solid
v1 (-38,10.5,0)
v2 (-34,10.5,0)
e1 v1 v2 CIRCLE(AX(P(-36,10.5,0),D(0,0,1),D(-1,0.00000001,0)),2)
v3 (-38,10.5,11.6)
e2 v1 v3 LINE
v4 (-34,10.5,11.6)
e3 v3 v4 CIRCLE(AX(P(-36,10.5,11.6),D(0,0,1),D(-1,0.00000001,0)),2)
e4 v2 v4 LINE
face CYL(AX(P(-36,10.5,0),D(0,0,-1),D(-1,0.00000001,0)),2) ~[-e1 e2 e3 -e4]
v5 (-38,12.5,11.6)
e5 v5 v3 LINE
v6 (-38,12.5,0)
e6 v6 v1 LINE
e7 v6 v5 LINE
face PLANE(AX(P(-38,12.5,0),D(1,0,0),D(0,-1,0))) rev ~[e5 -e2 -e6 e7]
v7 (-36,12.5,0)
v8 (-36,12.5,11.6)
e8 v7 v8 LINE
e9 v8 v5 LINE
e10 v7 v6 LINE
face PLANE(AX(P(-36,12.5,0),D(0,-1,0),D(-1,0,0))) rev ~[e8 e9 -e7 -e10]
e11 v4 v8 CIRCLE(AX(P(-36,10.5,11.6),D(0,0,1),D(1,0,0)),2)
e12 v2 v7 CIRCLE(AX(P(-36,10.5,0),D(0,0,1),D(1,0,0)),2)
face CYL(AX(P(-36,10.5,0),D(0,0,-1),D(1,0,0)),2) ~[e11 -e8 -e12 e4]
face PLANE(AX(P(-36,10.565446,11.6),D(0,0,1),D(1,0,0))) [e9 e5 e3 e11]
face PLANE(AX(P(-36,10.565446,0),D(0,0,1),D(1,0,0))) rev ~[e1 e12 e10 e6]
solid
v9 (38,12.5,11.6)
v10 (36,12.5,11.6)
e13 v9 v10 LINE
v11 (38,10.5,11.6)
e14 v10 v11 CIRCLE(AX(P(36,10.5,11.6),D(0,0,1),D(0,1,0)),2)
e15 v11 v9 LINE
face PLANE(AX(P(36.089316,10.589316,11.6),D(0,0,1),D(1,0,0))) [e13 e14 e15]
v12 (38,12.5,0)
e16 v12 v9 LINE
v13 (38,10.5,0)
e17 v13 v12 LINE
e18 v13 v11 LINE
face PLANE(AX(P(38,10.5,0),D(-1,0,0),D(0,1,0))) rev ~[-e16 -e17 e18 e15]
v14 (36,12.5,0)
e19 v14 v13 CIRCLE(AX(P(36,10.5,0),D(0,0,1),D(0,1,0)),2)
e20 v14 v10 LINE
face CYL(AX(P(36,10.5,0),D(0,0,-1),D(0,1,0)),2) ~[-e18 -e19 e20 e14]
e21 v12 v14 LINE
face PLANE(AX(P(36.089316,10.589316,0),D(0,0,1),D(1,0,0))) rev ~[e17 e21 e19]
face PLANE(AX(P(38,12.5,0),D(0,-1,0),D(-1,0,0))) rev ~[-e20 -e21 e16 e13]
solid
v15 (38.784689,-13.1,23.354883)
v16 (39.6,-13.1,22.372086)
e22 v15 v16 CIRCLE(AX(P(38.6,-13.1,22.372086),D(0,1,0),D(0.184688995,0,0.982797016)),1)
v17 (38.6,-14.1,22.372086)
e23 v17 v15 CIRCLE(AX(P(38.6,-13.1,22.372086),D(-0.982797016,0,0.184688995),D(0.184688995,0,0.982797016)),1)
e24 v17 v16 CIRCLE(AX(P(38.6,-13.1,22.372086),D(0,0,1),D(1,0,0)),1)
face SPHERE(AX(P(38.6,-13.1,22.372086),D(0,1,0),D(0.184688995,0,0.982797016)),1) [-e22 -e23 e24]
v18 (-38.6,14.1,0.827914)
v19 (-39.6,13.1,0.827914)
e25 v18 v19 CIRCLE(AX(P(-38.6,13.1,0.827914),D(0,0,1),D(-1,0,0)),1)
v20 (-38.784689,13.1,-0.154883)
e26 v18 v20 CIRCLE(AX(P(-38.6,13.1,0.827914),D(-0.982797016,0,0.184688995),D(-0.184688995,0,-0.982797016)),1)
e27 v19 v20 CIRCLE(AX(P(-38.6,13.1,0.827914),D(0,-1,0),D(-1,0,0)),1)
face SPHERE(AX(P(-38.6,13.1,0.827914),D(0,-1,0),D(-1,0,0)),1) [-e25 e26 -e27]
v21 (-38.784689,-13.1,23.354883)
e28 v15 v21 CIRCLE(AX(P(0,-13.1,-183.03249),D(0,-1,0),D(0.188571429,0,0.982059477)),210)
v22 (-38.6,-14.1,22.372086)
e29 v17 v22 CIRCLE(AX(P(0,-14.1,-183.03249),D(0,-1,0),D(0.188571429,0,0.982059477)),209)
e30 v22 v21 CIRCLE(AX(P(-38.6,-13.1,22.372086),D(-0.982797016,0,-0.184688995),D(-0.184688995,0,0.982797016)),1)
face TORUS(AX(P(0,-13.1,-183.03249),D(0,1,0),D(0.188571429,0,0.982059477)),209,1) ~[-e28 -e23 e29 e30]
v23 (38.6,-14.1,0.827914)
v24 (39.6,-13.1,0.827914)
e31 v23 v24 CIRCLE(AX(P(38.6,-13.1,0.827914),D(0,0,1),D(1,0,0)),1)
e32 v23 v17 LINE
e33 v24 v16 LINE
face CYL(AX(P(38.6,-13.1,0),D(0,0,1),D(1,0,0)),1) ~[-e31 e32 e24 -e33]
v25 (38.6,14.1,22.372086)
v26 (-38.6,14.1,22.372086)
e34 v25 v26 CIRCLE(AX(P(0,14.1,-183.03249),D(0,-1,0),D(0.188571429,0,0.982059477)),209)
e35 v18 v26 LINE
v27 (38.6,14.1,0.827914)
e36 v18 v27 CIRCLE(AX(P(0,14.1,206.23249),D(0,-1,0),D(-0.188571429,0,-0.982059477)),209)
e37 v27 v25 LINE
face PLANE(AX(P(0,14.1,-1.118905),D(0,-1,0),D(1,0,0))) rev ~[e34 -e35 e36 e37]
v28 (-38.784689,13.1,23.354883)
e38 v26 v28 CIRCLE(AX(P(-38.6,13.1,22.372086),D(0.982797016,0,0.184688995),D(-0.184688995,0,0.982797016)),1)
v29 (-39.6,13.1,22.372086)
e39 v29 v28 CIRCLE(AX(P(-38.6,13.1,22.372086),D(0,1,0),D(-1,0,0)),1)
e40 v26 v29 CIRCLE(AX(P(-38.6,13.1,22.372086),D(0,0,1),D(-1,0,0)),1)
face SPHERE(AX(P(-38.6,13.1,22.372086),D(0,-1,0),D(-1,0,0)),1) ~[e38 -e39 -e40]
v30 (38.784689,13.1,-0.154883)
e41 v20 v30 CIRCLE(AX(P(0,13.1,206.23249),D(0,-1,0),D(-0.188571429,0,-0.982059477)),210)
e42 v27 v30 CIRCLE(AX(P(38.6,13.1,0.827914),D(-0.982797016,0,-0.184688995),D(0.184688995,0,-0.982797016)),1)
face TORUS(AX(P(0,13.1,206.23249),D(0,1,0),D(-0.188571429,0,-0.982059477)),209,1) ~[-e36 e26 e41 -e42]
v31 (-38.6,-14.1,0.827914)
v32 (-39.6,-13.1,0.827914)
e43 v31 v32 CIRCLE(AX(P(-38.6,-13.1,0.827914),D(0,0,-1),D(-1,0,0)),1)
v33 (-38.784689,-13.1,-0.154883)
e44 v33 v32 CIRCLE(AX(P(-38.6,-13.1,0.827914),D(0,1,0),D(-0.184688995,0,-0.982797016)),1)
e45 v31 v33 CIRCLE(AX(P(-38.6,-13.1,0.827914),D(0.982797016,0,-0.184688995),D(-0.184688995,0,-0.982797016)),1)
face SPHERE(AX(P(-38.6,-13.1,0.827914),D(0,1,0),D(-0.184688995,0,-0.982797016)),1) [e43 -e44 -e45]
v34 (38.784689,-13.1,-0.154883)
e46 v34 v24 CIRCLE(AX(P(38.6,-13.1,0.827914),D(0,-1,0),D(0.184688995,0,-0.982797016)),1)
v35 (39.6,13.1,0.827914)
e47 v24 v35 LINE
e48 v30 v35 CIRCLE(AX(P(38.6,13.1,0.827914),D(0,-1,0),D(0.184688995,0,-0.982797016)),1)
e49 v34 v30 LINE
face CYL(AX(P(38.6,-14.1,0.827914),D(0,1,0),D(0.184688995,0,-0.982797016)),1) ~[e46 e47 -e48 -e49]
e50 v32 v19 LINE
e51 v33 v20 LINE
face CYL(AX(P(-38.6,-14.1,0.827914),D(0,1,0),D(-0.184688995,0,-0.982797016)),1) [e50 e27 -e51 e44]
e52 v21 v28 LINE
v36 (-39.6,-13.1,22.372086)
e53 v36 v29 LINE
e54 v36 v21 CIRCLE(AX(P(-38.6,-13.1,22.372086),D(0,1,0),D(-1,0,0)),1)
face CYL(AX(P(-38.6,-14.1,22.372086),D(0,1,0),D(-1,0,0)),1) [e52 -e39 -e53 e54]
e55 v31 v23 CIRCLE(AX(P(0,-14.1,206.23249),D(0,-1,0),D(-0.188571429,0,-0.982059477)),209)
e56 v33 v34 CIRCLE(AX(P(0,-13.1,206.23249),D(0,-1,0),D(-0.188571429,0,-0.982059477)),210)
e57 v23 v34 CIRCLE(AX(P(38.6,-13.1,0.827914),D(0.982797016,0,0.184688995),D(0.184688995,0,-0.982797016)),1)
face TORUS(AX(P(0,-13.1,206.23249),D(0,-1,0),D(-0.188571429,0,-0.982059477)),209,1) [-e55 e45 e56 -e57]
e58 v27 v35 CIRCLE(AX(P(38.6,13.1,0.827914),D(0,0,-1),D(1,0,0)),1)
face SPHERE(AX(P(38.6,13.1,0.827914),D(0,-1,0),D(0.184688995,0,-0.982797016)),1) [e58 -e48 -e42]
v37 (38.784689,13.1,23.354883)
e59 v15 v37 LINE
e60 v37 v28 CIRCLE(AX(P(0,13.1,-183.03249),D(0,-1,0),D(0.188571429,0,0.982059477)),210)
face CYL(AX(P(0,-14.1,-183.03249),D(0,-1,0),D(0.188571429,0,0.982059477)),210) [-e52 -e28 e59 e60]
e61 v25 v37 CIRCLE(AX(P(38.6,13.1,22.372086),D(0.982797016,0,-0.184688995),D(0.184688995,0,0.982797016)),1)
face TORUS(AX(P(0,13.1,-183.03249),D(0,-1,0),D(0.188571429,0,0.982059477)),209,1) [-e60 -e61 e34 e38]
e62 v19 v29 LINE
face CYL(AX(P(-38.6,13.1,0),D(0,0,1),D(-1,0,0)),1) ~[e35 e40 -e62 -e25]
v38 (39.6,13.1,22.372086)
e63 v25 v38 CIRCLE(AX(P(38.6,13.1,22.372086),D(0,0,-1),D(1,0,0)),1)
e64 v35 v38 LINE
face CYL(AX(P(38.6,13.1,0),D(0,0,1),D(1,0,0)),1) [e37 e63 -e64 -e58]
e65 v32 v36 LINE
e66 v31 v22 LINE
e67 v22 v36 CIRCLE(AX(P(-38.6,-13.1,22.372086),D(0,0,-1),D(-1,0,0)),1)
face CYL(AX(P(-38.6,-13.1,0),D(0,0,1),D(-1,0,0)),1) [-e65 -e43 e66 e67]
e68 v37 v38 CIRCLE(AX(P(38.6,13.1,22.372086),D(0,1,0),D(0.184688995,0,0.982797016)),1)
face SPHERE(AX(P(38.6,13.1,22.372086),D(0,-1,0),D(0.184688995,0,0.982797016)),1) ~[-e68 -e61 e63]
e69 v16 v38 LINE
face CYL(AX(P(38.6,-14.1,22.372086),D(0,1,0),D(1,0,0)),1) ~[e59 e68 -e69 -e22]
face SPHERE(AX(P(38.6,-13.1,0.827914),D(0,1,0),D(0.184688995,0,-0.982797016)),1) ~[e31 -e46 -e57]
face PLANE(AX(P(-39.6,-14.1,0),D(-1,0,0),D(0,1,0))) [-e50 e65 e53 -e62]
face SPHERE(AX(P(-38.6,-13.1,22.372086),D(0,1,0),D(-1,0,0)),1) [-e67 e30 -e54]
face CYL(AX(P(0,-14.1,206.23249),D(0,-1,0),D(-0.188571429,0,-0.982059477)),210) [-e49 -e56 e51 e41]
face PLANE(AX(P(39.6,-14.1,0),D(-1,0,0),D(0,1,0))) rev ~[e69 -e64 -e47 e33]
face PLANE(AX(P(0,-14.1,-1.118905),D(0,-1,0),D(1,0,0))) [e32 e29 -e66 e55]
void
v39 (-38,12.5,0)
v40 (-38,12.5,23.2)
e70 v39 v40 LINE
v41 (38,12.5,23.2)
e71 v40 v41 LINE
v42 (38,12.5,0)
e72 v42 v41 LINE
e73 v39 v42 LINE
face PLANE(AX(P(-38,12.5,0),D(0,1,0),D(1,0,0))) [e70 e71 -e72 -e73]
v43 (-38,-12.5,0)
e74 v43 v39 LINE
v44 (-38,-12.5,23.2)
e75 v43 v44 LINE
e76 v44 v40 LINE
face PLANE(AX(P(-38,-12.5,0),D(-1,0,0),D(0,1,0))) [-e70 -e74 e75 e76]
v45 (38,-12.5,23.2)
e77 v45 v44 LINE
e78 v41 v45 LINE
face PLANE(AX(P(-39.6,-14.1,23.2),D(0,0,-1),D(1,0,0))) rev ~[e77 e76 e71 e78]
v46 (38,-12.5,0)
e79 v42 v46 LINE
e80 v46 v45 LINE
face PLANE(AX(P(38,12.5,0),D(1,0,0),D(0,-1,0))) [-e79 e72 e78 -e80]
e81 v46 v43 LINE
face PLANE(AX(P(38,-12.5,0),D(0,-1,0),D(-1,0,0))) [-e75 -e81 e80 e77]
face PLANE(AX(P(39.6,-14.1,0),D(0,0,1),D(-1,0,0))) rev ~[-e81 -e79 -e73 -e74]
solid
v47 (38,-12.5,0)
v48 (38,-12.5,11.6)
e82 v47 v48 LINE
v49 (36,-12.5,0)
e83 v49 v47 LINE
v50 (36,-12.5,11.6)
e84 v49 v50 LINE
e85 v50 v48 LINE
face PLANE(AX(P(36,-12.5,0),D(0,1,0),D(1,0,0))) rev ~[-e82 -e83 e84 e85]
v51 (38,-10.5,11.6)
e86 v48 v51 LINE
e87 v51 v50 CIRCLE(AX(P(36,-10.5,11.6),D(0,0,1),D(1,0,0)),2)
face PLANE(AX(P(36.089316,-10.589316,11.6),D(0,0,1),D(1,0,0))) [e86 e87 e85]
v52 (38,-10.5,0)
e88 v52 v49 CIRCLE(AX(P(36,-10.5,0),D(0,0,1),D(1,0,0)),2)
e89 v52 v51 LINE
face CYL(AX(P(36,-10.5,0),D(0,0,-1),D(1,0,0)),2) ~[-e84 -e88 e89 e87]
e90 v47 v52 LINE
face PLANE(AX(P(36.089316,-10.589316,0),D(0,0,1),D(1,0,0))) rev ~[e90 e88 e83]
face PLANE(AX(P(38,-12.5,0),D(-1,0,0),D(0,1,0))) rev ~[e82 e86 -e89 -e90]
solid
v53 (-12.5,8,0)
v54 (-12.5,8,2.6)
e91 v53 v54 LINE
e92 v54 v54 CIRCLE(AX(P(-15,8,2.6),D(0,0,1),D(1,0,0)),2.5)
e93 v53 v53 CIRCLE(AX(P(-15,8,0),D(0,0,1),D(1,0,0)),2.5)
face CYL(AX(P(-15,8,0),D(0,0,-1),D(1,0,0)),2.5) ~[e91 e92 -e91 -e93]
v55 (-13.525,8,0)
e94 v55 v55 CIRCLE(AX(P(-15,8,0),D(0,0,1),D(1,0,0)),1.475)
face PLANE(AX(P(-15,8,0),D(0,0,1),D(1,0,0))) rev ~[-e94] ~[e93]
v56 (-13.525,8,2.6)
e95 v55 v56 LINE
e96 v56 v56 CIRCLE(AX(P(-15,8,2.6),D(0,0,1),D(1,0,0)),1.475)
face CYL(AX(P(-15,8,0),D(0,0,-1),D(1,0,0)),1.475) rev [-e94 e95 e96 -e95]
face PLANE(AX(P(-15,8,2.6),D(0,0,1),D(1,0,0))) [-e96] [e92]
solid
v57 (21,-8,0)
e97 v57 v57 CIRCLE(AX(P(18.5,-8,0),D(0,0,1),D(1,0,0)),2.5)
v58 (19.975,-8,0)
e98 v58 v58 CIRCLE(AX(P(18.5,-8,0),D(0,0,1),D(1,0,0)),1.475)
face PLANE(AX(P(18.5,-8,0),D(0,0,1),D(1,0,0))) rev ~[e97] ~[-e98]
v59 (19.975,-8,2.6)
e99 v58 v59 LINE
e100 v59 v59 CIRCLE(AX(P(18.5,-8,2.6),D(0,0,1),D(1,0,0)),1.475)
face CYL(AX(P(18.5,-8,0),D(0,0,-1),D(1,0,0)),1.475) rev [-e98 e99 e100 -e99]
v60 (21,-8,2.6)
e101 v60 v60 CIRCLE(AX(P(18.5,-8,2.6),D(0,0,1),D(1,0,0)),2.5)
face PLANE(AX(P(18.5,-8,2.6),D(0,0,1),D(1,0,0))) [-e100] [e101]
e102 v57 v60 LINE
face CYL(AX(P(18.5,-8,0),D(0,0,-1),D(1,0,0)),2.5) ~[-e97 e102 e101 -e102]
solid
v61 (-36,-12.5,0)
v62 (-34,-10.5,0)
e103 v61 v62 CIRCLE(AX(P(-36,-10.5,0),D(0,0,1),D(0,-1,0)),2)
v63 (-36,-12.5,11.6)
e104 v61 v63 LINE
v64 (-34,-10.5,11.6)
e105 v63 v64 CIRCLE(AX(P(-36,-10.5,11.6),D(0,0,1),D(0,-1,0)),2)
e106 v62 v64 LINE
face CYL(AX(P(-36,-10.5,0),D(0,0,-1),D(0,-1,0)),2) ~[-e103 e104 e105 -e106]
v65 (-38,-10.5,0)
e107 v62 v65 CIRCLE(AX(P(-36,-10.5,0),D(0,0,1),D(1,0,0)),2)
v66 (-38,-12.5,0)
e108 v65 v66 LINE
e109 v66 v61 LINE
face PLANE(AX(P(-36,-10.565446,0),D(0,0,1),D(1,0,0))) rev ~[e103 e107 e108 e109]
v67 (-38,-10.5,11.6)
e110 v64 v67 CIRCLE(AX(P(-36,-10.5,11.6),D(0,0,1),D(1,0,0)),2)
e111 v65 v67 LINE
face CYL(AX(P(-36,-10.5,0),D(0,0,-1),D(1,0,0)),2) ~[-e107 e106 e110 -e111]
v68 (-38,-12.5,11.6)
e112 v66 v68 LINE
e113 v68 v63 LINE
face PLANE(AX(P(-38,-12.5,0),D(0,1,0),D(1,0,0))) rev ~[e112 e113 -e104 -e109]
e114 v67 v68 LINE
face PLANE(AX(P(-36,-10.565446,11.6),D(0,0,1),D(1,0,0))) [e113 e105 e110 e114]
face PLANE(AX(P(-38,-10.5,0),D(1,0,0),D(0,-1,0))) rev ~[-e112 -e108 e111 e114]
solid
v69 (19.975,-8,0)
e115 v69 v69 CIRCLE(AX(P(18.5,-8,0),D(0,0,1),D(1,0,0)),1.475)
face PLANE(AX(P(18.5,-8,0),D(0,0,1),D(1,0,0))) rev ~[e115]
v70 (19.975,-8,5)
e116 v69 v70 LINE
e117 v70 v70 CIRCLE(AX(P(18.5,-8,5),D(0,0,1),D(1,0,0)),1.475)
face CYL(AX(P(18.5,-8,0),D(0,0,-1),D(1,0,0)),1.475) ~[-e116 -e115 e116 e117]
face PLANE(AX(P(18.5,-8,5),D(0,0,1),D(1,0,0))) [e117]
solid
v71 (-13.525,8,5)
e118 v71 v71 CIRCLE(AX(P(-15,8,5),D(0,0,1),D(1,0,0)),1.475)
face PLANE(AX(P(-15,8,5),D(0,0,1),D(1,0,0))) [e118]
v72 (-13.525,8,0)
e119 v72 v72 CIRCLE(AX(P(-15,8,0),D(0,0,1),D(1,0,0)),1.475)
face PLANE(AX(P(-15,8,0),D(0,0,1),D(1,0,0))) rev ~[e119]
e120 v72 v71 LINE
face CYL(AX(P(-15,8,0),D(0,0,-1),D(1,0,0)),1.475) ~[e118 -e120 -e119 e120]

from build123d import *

# Parameters (mm, degrees)
F0_R     = 1.475
F1_DEPTH = 5
F0_R_2   = 2.5
F2_DEPTH = 2.6
F0_W     = 79.2
F0_H     = 28.2
F3_DEPTH = 23.2
F4_DEPTH = 11.6
F7_DEPTH = 28.2
F8_DEPTH = 28.2
F10_R    = 1


# Not quite as in the source:
# - two fillets or chamfers of one size are made in one step


with BuildPart() as f1:
    # F0 (on Top) → F1 (new body)
    with BuildSketch(Plane.XY):
        with Locations((-15, 8)):
            Circle(F0_R)
    extrude(amount=F1_DEPTH)


with BuildPart() as f1b:
    # F0 (on Top) → F1, piece 2 (new body)
    with BuildSketch(Plane.XY):
        with Locations((18.5, -8)):
            Circle(F0_R)
    extrude(amount=F1_DEPTH)


with BuildPart() as f2:
    # F0 (on Top) → F2 (new body)
    with BuildSketch(Plane.XY):
        with Locations((18.5, -8)):
            Circle(F0_R_2)
        with Locations((18.5, -8)):
            Circle(F0_R, mode=Mode.SUBTRACT)
    extrude(amount=F2_DEPTH)


with BuildPart() as f2b:
    # F0 (on Top) → F2, piece 2 (new body)
    with BuildSketch(Plane.XY):
        with Locations((-15, 8)):
            Circle(F0_R_2)
        with Locations((-15, 8)):
            Circle(F0_R, mode=Mode.SUBTRACT)
    extrude(amount=F2_DEPTH)


with BuildPart() as f3:
    # F0 (on Top) → F3 (new body)
    with BuildSketch(Plane.XY):
        Rectangle(F0_W, F0_H)
        Polygon((38, -10.5), (38, -12.5), (36, -12.5), (-36, -12.5), (-38, -12.5), (-38, -10.5), (-38, 10.5000000193), (-38, 12.5), (-36, 12.5), (36, 12.5), (38, 12.5), (38, 10.5), align=None, mode=Mode.SUBTRACT)
    extrude(amount=F3_DEPTH)

    # F5 (on face) → F7 (join, through all)
    with BuildSketch(Plane.XZ.offset(14.1)):
        with BuildLine():
            Line((-39.6, 23.2), (39.6, 23.2))
            ThreePointArc((39.6, 23.2), (0, 26.9675098342), (-39.6, 23.2))
        make_face()
    extrude(amount=-F7_DEPTH)

    # F6 (on face) → F8 (join, through all)
    with BuildSketch(Plane.XZ.offset(14.1)):
        with BuildLine():
            ThreePointArc((-39.6, 0), (0, -3.7675098342), (39.6, 0))
            Line((39.6, 0), (-39.6, 0))
        make_face()
    extrude(amount=-F8_DEPTH)

    # F10
    f10_edges = [f3.edges().sort_by_distance(p)[0] for p in [
        (-39.6, 14.1, 11.6),
        (-39.6, -14.1, 11.6),
        (39.6, 14.1, 11.6),
        (39.6, -14.1, 11.6),
        (39.6, 0, 0),
        (0, 14.1, -3.76751),
        (-39.6, 0, 0),
        (0, -14.1, -3.76751),
        (39.6, 0, 23.2),
        (0, -14.1, 26.96751),
        (0, 14.1, 26.96751),
        (-39.6, 0, 23.2),
    ]]
    fillet(f10_edges, radius=F10_R)


with BuildPart() as f4:
    # F0 (on Top) → F4 (new body)
    with BuildSketch(Plane.XY):
        with BuildLine():
            ThreePointArc((-36, 12.5), (-37.4142135555, 11.9142135692), (-38, 10.5000000193))
            ThreePointArc((-38, 10.5000000193), (-36.0000000097, 8.5), (-34, 10.5))
            ThreePointArc((-34, 10.5), (-34.5857864376, 11.9142135624), (-36, 12.5))
        make_face()
        with BuildLine():
            Line((-38, 12.5), (-38, 10.5000000193))
            ThreePointArc((-38, 10.5000000193), (-37.4142135555, 11.9142135692), (-36, 12.5))
            Line((-36, 12.5), (-38, 12.5))
        make_face()
    extrude(amount=F4_DEPTH)


with BuildPart() as f4b:
    # F0 (on Top) → F4, piece 2 (new body)
    with BuildSketch(Plane.XY):
        with BuildLine():
            ThreePointArc((-38, -10.5), (-37.4142135624, -11.9142135624), (-36, -12.5))
            ThreePointArc((-36, -12.5), (-34.5857864376, -11.9142135624), (-34, -10.5))
            ThreePointArc((-34, -10.5), (-36, -8.5), (-38, -10.5))
        make_face()
        with BuildLine():
            Line((-38, -12.5), (-36, -12.5))
            ThreePointArc((-36, -12.5), (-37.4142135624, -11.9142135624), (-38, -10.5))
            Line((-38, -10.5), (-38, -12.5))
        make_face()
    extrude(amount=F4_DEPTH)


with BuildPart() as f4c:
    # F0 (on Top) → F4, piece 3 (new body)
    with BuildSketch(Plane.XY):
        with BuildLine():
            ThreePointArc((36, 12.5), (34.5857864376, 9.0857864376), (38, 10.5))
            ThreePointArc((38, 10.5), (37.4142135624, 11.9142135624), (36, 12.5))
        make_face()
        with BuildLine():
            ThreePointArc((36, 12.5), (37.4142135624, 11.9142135624), (38, 10.5))
            Line((38, 10.5), (38, 12.5))
            Line((38, 12.5), (36, 12.5))
        make_face()
    extrude(amount=F4_DEPTH)


with BuildPart() as f4d:
    # F0 (on Top) → F4, piece 4 (new body)
    with BuildSketch(Plane.XY):
        with BuildLine():
            ThreePointArc((38, -10.5), (34.5857864376, -9.0857864376), (36, -12.5))
            ThreePointArc((36, -12.5), (37.4142135624, -11.9142135624), (38, -10.5))
        make_face()
        with BuildLine():
            Line((36, -12.5), (38, -12.5))
            Line((38, -12.5), (38, -10.5))
            ThreePointArc((38, -10.5), (37.4142135624, -11.9142135624), (36, -12.5))
        make_face()
    extrude(amount=F4_DEPTH)


solid = Compound([f1.part, f1b.part, f2.part, f2b.part, f3.part, f4.part, f4b.part, f4c.part, f4d.part])
